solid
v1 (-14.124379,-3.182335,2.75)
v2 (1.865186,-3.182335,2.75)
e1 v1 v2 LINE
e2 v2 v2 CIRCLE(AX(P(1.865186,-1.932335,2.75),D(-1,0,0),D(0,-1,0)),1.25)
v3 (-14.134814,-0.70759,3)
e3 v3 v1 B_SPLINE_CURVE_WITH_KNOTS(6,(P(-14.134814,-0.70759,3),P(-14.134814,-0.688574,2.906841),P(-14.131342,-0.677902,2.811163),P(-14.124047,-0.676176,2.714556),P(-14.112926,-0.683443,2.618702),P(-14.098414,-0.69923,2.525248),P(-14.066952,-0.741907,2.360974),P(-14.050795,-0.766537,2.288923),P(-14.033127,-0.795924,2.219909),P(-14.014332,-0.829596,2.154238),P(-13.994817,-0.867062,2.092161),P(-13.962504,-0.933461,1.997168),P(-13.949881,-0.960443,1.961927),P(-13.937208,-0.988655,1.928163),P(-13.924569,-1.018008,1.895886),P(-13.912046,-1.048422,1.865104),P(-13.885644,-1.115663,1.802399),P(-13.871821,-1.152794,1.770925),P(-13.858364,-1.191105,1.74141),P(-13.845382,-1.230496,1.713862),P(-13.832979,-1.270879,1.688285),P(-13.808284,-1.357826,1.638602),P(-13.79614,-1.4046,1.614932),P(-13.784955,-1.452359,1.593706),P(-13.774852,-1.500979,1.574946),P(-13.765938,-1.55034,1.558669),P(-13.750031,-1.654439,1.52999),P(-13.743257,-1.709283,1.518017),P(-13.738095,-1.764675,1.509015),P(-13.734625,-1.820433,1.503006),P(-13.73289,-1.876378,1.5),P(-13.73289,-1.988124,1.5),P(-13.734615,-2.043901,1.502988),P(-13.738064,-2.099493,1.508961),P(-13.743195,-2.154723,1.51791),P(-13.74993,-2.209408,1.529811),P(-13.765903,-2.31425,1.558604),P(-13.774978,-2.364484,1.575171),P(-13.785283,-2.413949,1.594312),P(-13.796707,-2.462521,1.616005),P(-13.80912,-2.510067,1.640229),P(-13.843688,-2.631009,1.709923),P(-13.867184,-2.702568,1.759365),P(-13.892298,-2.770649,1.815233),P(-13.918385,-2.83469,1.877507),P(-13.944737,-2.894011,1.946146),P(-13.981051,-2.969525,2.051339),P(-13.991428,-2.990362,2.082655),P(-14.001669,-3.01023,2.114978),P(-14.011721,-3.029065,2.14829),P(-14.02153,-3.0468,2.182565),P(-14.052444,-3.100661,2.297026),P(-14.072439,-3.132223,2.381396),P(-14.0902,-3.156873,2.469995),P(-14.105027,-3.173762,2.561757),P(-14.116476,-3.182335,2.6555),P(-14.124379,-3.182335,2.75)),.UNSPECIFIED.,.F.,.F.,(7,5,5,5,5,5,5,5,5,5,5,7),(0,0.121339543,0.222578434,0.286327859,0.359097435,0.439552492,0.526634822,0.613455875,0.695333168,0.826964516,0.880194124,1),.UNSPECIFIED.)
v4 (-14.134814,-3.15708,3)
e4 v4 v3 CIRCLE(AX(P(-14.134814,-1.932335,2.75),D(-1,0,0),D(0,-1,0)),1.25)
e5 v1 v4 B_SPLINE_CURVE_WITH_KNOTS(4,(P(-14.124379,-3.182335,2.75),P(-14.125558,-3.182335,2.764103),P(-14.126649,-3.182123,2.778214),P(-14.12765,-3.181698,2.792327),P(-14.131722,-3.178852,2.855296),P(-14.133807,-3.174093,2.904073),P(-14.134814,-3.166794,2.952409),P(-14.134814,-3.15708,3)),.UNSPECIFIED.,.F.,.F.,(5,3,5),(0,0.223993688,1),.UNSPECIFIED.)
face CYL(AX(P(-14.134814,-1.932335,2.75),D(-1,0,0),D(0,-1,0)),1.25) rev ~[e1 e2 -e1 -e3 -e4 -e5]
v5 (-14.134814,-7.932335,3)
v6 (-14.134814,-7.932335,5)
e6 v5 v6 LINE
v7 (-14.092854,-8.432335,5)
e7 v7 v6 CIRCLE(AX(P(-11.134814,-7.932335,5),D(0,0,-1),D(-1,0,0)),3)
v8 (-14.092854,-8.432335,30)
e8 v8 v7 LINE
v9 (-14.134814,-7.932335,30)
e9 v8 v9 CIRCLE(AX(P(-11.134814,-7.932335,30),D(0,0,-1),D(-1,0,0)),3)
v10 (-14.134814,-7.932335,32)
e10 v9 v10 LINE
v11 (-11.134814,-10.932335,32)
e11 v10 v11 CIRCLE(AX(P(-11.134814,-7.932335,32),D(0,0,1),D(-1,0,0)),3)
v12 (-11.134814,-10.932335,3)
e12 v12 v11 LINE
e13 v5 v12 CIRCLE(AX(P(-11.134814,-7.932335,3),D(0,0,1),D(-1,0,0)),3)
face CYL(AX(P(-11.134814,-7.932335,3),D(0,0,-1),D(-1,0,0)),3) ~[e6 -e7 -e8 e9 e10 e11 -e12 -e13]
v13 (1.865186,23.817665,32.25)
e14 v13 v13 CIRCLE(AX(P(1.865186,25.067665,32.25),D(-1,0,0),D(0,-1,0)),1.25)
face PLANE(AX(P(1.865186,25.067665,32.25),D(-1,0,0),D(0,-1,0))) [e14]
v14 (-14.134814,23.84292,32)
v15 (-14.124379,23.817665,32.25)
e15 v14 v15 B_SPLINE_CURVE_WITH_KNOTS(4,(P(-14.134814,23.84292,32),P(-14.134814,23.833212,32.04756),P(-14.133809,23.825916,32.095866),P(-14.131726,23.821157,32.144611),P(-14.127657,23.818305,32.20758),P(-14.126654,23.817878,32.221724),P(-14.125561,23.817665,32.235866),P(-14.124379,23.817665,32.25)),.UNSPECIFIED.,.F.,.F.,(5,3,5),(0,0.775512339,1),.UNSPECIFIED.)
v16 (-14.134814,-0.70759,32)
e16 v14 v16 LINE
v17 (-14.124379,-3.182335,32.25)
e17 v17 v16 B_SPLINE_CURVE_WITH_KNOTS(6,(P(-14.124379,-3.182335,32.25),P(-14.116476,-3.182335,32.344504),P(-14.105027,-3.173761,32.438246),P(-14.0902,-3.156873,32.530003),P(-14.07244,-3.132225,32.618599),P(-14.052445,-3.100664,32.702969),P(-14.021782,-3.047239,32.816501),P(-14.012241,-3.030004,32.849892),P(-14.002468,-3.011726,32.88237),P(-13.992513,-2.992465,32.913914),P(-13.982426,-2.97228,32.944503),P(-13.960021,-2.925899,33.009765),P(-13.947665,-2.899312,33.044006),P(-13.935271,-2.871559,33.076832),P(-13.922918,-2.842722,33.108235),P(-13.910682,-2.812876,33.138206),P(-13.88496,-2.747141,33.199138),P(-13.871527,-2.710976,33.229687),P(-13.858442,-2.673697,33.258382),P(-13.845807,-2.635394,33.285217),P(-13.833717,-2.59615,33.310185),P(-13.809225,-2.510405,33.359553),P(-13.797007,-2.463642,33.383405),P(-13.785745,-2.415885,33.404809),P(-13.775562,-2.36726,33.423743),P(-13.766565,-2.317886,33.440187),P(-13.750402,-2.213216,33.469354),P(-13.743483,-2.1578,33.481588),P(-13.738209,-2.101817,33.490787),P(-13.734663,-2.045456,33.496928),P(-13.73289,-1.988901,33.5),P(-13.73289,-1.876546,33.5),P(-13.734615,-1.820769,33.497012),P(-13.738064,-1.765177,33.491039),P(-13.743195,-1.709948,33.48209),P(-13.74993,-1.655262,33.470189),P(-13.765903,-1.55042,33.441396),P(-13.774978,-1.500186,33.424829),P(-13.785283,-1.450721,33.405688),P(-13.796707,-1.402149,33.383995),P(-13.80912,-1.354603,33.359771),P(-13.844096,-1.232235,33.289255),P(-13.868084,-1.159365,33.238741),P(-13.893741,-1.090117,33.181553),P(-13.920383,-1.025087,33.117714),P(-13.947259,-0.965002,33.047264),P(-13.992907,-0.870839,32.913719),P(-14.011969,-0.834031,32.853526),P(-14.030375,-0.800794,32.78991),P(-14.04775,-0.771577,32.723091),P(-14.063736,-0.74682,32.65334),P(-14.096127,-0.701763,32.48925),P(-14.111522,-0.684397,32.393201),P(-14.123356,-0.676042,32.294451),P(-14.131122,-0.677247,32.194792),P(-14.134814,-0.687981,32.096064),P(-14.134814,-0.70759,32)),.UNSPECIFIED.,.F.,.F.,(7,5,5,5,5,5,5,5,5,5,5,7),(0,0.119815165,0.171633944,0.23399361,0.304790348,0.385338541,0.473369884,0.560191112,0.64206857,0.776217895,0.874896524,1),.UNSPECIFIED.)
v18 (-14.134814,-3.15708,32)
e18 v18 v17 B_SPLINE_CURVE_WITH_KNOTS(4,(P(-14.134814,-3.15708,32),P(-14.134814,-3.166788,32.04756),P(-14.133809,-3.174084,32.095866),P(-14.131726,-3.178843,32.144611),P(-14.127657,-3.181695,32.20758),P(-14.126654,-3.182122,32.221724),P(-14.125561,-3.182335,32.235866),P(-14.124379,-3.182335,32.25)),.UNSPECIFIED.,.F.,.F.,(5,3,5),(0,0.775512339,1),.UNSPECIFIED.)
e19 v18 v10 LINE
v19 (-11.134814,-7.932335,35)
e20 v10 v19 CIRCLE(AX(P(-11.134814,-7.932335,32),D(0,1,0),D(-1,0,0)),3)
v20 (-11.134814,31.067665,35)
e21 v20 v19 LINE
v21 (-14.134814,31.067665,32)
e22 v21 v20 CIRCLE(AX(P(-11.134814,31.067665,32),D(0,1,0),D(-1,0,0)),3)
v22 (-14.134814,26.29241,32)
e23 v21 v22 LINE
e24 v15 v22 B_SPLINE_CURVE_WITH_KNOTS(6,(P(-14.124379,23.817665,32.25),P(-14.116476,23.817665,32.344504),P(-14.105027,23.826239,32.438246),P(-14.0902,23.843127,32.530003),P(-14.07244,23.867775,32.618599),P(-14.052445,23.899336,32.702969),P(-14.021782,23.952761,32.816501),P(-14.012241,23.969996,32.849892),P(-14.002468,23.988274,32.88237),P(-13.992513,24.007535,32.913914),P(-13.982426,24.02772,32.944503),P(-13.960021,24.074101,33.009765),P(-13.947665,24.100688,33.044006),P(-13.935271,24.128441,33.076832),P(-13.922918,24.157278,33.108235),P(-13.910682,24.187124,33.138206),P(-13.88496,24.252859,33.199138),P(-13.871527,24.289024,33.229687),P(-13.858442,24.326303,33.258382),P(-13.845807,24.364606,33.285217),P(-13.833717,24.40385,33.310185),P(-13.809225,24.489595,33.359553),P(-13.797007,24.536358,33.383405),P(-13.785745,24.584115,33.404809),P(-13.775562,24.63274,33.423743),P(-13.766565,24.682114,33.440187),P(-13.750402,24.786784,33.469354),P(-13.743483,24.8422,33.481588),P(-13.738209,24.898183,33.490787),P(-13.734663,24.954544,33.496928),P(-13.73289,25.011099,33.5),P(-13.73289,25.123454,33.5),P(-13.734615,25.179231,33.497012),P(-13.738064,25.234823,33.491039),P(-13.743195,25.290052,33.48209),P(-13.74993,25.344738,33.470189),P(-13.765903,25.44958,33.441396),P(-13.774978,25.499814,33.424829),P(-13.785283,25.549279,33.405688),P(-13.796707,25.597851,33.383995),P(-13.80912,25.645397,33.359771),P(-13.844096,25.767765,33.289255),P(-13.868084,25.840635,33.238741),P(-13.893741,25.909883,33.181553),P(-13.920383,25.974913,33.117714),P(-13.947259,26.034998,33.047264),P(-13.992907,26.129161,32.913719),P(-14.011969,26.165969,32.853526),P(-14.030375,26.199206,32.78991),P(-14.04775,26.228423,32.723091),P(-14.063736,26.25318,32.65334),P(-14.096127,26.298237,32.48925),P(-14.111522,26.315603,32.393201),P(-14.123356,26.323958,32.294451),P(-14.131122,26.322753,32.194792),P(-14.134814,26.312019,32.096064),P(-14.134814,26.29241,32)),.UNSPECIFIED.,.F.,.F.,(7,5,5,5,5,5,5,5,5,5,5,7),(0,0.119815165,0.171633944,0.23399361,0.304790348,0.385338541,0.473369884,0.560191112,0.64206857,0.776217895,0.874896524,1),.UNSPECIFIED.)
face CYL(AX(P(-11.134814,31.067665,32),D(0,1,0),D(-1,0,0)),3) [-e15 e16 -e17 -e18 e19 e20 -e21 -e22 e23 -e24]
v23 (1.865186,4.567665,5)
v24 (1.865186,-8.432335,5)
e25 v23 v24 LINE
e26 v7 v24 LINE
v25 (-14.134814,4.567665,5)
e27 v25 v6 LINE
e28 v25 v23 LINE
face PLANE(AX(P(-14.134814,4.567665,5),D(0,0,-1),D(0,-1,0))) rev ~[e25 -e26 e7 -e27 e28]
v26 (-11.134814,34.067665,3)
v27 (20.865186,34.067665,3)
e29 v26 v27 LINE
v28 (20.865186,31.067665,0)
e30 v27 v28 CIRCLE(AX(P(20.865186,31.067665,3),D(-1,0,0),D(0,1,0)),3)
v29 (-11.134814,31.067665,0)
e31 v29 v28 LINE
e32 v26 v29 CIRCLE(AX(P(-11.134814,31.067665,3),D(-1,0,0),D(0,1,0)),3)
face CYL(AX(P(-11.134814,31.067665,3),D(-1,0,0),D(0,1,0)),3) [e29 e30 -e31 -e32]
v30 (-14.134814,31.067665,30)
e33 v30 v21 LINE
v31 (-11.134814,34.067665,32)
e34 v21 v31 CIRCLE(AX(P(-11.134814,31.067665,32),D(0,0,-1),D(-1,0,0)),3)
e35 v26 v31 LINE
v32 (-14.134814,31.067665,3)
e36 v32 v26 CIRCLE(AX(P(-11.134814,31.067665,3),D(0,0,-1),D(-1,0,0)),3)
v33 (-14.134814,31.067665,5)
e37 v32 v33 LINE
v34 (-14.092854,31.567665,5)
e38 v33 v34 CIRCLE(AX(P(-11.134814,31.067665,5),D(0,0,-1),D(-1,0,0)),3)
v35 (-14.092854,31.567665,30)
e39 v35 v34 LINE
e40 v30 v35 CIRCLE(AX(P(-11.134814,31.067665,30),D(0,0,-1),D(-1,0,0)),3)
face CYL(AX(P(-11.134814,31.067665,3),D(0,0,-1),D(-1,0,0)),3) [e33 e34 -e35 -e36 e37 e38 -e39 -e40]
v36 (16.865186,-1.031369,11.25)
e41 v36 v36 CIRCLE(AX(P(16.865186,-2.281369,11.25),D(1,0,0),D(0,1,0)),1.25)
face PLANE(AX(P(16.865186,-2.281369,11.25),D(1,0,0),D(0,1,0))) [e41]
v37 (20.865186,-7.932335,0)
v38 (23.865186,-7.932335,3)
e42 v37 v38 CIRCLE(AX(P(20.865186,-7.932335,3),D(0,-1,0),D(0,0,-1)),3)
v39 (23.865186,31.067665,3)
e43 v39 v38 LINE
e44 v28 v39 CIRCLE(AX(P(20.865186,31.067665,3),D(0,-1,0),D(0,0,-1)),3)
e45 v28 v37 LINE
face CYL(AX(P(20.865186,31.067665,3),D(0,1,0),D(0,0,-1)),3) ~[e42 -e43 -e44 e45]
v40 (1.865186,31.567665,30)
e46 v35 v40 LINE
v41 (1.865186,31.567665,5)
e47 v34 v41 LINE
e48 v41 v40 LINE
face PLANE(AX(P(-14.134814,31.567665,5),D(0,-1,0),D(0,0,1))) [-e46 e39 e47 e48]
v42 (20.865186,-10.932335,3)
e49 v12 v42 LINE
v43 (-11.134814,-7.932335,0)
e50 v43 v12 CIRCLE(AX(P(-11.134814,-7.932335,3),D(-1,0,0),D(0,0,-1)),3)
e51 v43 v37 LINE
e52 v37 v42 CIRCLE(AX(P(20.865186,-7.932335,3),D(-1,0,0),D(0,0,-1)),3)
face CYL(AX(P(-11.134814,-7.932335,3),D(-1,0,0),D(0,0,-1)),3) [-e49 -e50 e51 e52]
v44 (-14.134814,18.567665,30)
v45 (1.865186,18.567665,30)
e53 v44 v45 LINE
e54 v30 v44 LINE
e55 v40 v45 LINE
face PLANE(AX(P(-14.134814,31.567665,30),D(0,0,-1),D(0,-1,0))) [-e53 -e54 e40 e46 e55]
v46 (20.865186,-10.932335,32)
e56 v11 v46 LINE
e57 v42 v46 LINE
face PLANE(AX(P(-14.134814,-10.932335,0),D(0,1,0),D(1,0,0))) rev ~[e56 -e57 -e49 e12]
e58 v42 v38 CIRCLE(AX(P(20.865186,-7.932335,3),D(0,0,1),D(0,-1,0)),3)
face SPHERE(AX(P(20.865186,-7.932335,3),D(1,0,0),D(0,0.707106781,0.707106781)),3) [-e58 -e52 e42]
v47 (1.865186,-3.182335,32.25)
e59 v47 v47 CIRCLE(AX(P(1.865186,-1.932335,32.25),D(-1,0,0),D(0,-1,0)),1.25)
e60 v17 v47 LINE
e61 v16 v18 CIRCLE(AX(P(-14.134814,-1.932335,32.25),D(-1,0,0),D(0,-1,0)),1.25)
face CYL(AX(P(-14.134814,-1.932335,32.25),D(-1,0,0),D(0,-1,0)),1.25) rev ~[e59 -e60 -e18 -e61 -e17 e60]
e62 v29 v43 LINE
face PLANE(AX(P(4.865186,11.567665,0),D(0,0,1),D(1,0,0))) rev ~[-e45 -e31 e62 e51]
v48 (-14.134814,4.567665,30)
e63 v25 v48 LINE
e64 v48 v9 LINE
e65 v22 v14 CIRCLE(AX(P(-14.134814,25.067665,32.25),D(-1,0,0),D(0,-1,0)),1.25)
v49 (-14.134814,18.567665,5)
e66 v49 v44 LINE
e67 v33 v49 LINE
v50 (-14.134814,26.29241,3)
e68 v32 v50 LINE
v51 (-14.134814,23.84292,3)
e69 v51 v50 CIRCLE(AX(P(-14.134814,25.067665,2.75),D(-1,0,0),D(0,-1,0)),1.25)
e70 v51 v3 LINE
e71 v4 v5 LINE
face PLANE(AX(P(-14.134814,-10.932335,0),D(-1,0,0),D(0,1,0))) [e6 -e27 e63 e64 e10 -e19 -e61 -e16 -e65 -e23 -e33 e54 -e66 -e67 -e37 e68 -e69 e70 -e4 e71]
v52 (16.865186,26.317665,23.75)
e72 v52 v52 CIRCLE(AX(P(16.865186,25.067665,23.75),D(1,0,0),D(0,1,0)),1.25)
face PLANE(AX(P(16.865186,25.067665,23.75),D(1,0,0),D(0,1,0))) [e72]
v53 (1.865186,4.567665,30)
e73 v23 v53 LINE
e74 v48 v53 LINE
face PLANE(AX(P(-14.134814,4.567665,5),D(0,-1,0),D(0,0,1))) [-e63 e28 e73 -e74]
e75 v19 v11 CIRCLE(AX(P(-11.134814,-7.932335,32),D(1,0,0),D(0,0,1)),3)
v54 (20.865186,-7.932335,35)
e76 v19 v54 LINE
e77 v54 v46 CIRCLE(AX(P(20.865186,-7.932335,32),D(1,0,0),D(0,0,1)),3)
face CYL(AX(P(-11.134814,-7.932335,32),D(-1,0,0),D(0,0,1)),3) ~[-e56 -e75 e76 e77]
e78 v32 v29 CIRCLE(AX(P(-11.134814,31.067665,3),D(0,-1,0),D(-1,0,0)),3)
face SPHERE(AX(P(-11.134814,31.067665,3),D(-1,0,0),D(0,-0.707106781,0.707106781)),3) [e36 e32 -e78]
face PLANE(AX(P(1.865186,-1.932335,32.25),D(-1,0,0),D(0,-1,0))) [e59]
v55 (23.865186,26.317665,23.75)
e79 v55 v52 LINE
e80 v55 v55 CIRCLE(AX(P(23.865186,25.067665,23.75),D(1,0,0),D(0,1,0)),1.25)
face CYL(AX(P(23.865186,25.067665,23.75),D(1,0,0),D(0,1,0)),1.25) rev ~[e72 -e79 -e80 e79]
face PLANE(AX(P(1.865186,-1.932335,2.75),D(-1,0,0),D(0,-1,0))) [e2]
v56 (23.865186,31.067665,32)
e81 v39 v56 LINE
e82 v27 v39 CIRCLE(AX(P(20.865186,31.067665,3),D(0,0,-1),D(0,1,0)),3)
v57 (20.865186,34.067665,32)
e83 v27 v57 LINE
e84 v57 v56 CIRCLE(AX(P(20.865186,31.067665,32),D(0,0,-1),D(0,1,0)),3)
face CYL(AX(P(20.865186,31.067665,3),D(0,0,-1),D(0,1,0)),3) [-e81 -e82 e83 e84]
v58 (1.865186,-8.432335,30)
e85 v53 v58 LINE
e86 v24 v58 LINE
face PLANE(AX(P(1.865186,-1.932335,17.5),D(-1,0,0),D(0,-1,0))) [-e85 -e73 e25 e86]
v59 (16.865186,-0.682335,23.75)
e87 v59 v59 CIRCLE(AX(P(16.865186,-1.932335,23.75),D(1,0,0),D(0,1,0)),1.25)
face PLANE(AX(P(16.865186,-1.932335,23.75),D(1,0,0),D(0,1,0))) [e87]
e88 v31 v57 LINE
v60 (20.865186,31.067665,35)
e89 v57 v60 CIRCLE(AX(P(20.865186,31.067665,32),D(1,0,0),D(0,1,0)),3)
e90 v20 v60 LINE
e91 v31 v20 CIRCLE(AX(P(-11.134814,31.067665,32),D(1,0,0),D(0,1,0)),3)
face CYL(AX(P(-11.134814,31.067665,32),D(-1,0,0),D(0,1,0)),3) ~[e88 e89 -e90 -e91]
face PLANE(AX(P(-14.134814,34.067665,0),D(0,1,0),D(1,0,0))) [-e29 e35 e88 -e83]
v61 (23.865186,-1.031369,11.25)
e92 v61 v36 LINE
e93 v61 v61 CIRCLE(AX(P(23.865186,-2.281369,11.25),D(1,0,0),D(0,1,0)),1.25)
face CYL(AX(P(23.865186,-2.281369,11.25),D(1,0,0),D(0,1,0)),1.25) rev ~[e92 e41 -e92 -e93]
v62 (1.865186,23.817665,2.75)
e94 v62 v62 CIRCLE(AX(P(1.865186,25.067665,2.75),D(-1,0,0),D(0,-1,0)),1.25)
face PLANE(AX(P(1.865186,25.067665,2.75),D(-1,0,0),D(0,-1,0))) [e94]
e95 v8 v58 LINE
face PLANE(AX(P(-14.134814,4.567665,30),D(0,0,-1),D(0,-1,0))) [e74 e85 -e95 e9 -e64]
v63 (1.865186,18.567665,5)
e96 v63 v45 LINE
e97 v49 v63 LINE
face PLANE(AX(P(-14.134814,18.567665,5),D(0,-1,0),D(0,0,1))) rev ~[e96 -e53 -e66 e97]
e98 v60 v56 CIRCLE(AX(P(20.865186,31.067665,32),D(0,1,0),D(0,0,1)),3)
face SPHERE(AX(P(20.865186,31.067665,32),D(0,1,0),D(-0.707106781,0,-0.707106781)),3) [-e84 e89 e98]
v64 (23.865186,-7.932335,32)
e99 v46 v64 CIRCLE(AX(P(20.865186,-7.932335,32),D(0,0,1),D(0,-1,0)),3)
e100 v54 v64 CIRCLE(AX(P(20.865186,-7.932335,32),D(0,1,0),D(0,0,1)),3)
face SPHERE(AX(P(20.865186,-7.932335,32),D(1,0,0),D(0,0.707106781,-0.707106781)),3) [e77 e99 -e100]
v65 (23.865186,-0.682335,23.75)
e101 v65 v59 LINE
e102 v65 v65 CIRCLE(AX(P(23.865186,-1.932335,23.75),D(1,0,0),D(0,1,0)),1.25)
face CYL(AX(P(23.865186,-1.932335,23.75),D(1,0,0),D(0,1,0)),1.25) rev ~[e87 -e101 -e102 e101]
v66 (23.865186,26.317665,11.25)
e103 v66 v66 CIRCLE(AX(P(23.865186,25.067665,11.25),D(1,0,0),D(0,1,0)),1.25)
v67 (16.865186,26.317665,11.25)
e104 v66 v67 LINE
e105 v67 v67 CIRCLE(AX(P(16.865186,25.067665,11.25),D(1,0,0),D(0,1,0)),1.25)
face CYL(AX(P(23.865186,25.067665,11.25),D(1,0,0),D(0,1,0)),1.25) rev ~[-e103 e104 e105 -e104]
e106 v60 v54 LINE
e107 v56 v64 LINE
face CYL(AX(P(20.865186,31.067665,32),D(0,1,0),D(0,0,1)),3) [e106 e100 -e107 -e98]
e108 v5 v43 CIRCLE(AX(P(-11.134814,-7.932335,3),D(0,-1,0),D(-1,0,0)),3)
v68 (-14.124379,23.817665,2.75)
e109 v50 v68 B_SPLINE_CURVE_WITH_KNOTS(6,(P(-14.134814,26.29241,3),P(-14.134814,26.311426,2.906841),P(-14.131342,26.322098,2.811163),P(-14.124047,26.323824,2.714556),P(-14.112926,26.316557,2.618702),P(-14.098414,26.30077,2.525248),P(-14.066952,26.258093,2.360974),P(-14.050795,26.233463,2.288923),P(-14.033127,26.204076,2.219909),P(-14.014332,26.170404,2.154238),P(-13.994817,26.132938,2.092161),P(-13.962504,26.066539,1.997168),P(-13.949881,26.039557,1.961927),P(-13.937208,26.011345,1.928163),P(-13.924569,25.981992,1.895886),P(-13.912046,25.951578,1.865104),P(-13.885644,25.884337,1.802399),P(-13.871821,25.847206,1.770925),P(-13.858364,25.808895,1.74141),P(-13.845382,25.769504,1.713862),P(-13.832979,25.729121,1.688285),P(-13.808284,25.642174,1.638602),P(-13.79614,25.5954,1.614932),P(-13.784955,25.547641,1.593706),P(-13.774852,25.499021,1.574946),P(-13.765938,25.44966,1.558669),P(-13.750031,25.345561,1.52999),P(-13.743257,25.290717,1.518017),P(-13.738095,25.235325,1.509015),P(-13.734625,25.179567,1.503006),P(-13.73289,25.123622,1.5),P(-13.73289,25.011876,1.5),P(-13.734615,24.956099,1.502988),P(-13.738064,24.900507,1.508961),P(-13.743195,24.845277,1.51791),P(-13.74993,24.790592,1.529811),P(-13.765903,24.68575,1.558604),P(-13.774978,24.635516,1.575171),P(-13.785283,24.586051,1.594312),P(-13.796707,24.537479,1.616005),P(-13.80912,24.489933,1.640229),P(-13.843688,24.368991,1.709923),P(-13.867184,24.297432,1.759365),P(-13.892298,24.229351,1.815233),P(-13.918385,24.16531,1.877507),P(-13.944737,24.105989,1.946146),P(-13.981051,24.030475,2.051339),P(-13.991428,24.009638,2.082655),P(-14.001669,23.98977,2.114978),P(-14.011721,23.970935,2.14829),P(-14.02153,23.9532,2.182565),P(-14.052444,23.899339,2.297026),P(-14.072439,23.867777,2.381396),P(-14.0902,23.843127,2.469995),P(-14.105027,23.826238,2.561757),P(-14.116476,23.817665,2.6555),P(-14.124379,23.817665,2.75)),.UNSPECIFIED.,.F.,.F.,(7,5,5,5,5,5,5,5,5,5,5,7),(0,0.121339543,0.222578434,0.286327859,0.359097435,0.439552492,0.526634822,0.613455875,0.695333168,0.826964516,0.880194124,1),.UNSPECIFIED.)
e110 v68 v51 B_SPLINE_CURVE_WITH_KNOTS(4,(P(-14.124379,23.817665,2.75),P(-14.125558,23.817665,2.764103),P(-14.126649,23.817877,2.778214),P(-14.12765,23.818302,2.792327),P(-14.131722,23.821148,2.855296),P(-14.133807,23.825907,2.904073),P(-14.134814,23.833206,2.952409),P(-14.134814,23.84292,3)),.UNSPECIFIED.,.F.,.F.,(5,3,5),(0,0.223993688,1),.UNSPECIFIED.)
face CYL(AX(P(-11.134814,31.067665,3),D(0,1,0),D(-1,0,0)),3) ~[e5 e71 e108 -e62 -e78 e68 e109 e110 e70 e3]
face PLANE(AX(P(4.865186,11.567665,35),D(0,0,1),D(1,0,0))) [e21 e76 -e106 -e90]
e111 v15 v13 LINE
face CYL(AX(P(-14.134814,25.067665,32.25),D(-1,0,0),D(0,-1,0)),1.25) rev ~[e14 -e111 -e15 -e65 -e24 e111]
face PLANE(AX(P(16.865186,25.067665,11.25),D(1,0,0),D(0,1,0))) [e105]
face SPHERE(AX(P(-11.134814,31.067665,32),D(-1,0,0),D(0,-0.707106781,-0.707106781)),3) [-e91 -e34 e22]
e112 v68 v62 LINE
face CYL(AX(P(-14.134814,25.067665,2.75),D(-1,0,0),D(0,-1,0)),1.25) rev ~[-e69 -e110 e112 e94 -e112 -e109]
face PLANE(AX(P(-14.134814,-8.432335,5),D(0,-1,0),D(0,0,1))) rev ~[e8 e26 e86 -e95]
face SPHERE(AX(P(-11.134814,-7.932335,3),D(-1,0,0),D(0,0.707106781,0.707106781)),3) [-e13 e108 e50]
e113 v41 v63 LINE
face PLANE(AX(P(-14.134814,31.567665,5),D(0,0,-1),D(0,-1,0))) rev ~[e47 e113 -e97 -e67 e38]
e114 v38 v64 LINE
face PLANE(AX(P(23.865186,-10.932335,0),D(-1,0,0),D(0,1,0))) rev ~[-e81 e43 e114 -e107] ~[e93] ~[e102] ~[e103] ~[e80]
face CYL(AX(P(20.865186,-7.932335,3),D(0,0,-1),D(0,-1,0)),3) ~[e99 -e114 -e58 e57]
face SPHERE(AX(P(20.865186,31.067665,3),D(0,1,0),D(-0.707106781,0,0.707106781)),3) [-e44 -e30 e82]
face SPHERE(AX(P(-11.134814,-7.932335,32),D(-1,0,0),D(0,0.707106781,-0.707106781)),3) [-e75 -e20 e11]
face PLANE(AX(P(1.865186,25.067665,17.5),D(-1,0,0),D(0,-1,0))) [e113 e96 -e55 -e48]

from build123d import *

# Parameters (mm, degrees)
F0_W         = 38
F0_H         = 45
F1_DEPTH     = 35
F2_W         = 13
F2_H         = 25
F2_R         = 1.25
F3_DEPTH     = 16
F4_T1_DEPTH  = 32
F4_T3_DEPTH  = 39
F4_T5_DEPTH  = 29
F4_S9_W      = 3
F4_S9_H      = 3
F4_T10_DEPTH = 3
F4_S15_W     = 3
F4_S15_H     = 3
F4_T16_DEPTH = 3
F4_S21_W     = 3
F4_S21_H     = 3
F4_T22_DEPTH = 3
F4_S27_W     = 3
F4_S27_H     = 3
F4_T28_DEPTH = 3
F4_S33_W     = 3
F4_S33_H     = 3
F4_T34_DEPTH = 3
F4_S39_W     = 3
F4_S39_H     = 3
F4_T40_DEPTH = 3
F4_S45_W     = 3
F4_S45_H     = 3
F4_T46_DEPTH = 3
F4_S51_W     = 3
F4_S51_H     = 3
F4_T52_DEPTH = 3
F5_R         = 1.25
F6_DEPTH     = 7


# Not quite as in the source:
# - a fillet or chamfer that OpenCascade refuses, or shapes differently, is made with other operations: its cross-section is extruded or revolved along the edge and cut away or added


with BuildPart() as f1:
    # F0 (on Top) → F1 (new body)
    with BuildSketch(Plane.XY):
        with Locations((4.8651863657, 11.567664966)):
            Rectangle(F0_W, F0_H)
    extrude(amount=F1_DEPTH)

    # F2 (on face) → F3 (cut)
    with BuildSketch(Plane(origin=(-14.1348136343, 0, 0), x_dir=(0, -1, 0), z_dir=(-1, 0, 0))):
        with Locations((-25.067664966, 17.5)):
            Rectangle(F2_W, F2_H)
        with Locations((1.932335034, 17.5)):
            Rectangle(F2_W, F2_H)
        with Locations((1.932335034, 32.25)):
            Circle(F2_R)
        with Locations((1.932335034, 2.75)):
            Circle(F2_R)
        with Locations((-25.067664966, 32.25)):
            Circle(F2_R)
        with Locations((-25.067664966, 2.75)):
            Circle(F2_R)
    extrude(amount=-F3_DEPTH, mode=Mode.SUBTRACT)

    # F4: fillet of radius 3 on 12 edges, made by hand

    # F4_s2 → F4_t1 (cut)
    with BuildSketch(Plane.YZ.offset(-11.1348136343)):
        with BuildLine():
            ThreePointArc((34.067664966, 3), (33.1889853095, 0.8786796564), (31.067664966, 0))
            Line((31.067664966, 0), (34.067664966, 0))
            Line((34.067664966, 0), (34.067664966, 3))
        make_face()
        with BuildLine():
            ThreePointArc((34.067664966, 32), (33.1889853095, 34.1213203436), (31.067664966, 35))
            Line((31.067664966, 35), (34.067664966, 35))
            Line((34.067664966, 35), (34.067664966, 32))
        make_face()
        with BuildLine():
            ThreePointArc((-7.932335034, 0), (-10.0536553776, 0.8786796564), (-10.932335034, 3))
            Line((-10.932335034, 3), (-10.932335034, 0))
            Line((-10.932335034, 0), (-7.932335034, 0))
        make_face()
        with BuildLine():
            ThreePointArc((-7.932335034, 35), (-10.0536553776, 34.1213203436), (-10.932335034, 32))
            Line((-10.932335034, 32), (-10.932335034, 35))
            Line((-10.932335034, 35), (-7.932335034, 35))
        make_face()
    extrude(amount=F4_T1_DEPTH, mode=Mode.SUBTRACT)

    # F4_s4 → F4_t3 (cut)
    with BuildSketch(Plane.XZ.offset(-31.067664966)):
        with BuildLine():
            ThreePointArc((20.8651863657, 35), (22.9865067092, 34.1213203436), (23.8651863657, 32))
            Line((23.8651863657, 32), (23.8651863657, 35))
            Line((23.8651863657, 35), (20.8651863657, 35))
        make_face()
        with BuildLine():
            ThreePointArc((20.8651863657, 0), (22.9865067092, 0.8786796564), (23.8651863657, 3))
            Line((23.8651863657, 3), (23.8651863657, 0))
            Line((23.8651863657, 0), (20.8651863657, 0))
        make_face()
        with BuildLine():
            ThreePointArc((-14.1348136343, 32), (-13.2561339779, 34.1213203436), (-11.1348136343, 35))
            Line((-11.1348136343, 35), (-14.1348136343, 35))
            Line((-14.1348136343, 35), (-14.1348136343, 32))
        make_face()
        with BuildLine():
            ThreePointArc((-14.1348136343, 3), (-13.2561339779, 0.8786796564), (-11.1348136343, 0))
            Line((-11.1348136343, 0), (-14.1348136343, 0))
            Line((-14.1348136343, 0), (-14.1348136343, 3))
        make_face()
    extrude(amount=F4_T3_DEPTH, mode=Mode.SUBTRACT)

    # F4_s6 → F4_t5 (cut)
    with BuildSketch(Plane.XY.offset(3)):
        with BuildLine():
            ThreePointArc((20.8651863657, 34.067664966), (22.9865067092, 33.1889853095), (23.8651863657, 31.067664966))
            Line((23.8651863657, 31.067664966), (23.8651863657, 34.067664966))
            Line((23.8651863657, 34.067664966), (20.8651863657, 34.067664966))
        make_face()
        with BuildLine():
            ThreePointArc((20.8651863657, -10.932335034), (22.9865067092, -10.0536553776), (23.8651863657, -7.932335034))
            Line((23.8651863657, -7.932335034), (23.8651863657, -10.932335034))
            Line((23.8651863657, -10.932335034), (20.8651863657, -10.932335034))
        make_face()
        with BuildLine():
            ThreePointArc((-14.1348136343, 31.067664966), (-13.2561339779, 33.1889853095), (-11.1348136343, 34.067664966))
            Line((-11.1348136343, 34.067664966), (-14.1348136343, 34.067664966))
            Line((-14.1348136343, 34.067664966), (-14.1348136343, 31.067664966))
        make_face()
        with BuildLine():
            ThreePointArc((-14.1348136343, -7.932335034), (-13.2561339779, -10.0536553776), (-11.1348136343, -10.932335034))
            Line((-11.1348136343, -10.932335034), (-14.1348136343, -10.932335034))
            Line((-14.1348136343, -10.932335034), (-14.1348136343, -7.932335034))
        make_face()
    extrude(amount=F4_T5_DEPTH, mode=Mode.SUBTRACT)


with BuildPart() as f4_tool8:
    # F4_s9 → F4_t10 (new body)
    with BuildSketch(Plane.XZ.offset(-31.067664966)):
        with Locations((22.3651863657, 1.5)):
            Rectangle(F4_S9_W, F4_S9_H)
    extrude(amount=-F4_T10_DEPTH)

    # F4_s11 → F4_t12 (revolve, cut)
    with BuildSketch(Plane(origin=(20.8651863657, 31.067664966, 3), x_dir=(-0.7071067812, 0, 0.7071067812), z_dir=(-0.7071067812, 0, -0.7071067812))):
        with BuildLine():
            ThreePointArc((0, -3), (3, 0), (0, 3))
            Line((0, 3), (0, -3))
        make_face()
    revolve(axis=Axis((20.8651863657, 31.067664966, 3), (0, 1, 0)), mode=Mode.SUBTRACT)


with BuildPart() as f1_1:
    add(f1.part)

    # F4_t7: cut F4_tool8
    add(f4_tool8.part, mode=Mode.SUBTRACT)


with BuildPart() as f4_tool14:
    # F4_s15 → F4_t16 (new body)
    with BuildSketch(Plane.YZ.offset(-11.1348136343)):
        with Locations((32.567664966, 1.5)):
            Rectangle(F4_S15_W, F4_S15_H)
    extrude(amount=-F4_T16_DEPTH)

    # F4_s17 → F4_t18 (revolve, cut)
    with BuildSketch(Plane(origin=(-11.1348136343, 31.067664966, 3), x_dir=(0, -0.7071067812, 0.7071067812), z_dir=(0, -0.7071067812, -0.7071067812))):
        with BuildLine():
            ThreePointArc((0, -3), (3, 0), (0, 3))
            Line((0, 3), (0, -3))
        make_face()
    revolve(axis=Axis((-11.1348136343, 31.067664966, 3), (-1, 0, 0)), mode=Mode.SUBTRACT)


with BuildPart() as f1_2:
    add(f1_1.part)

    # F4_t13: cut F4_tool14
    add(f4_tool14.part, mode=Mode.SUBTRACT)


with BuildPart() as f4_tool20:
    # F4_s21 → F4_t22 (new body)
    with BuildSketch(Plane.XZ.offset(-31.067664966)):
        with Locations((22.3651863657, 33.5)):
            Rectangle(F4_S21_W, F4_S21_H)
    extrude(amount=-F4_T22_DEPTH)

    # F4_s23 → F4_t24 (revolve, cut)
    with BuildSketch(Plane(origin=(20.8651863657, 31.067664966, 32), x_dir=(-0.7071067812, 0, -0.7071067812), z_dir=(0.7071067812, 0, -0.7071067812))):
        with BuildLine():
            ThreePointArc((0, -3), (3, 0), (0, 3))
            Line((0, 3), (0, -3))
        make_face()
    revolve(axis=Axis((20.8651863657, 31.067664966, 32), (0, 1, 0)), mode=Mode.SUBTRACT)


with BuildPart() as f1_3:
    add(f1_2.part)

    # F4_t19: cut F4_tool20
    add(f4_tool20.part, mode=Mode.SUBTRACT)


with BuildPart() as f4_tool26:
    # F4_s27 → F4_t28 (new body)
    with BuildSketch(Plane.YZ.offset(-11.1348136343)):
        with Locations((32.567664966, 33.5)):
            Rectangle(F4_S27_W, F4_S27_H)
    extrude(amount=-F4_T28_DEPTH)

    # F4_s29 → F4_t30 (revolve, cut)
    with BuildSketch(Plane(origin=(-11.1348136343, 31.067664966, 32), x_dir=(0, -0.7071067812, -0.7071067812), z_dir=(0, 0.7071067812, -0.7071067812))):
        with BuildLine():
            ThreePointArc((0, -3), (3, 0), (0, 3))
            Line((0, 3), (0, -3))
        make_face()
    revolve(axis=Axis((-11.1348136343, 31.067664966, 32), (-1, 0, 0)), mode=Mode.SUBTRACT)


with BuildPart() as f1_4:
    add(f1_3.part)

    # F4_t25: cut F4_tool26
    add(f4_tool26.part, mode=Mode.SUBTRACT)


with BuildPart() as f4_tool32:
    # F4_s33 → F4_t34 (new body)
    with BuildSketch(Plane.YZ.offset(-11.1348136343)):
        with Locations((-9.432335034, 1.5)):
            Rectangle(F4_S33_W, F4_S33_H)
    extrude(amount=-F4_T34_DEPTH)

    # F4_s35 → F4_t36 (revolve, cut)
    with BuildSketch(Plane(origin=(-11.1348136343, -7.932335034, 3), x_dir=(0, 0.7071067812, 0.7071067812), z_dir=(0, -0.7071067812, 0.7071067812))):
        with BuildLine():
            ThreePointArc((0, -3), (3, 0), (0, 3))
            Line((0, 3), (0, -3))
        make_face()
    revolve(axis=Axis((-11.1348136343, -7.932335034, 3), (-1, 0, 0)), mode=Mode.SUBTRACT)


with BuildPart() as f1_5:
    add(f1_4.part)

    # F4_t31: cut F4_tool32
    add(f4_tool32.part, mode=Mode.SUBTRACT)


with BuildPart() as f4_tool38:
    # F4_s39 → F4_t40 (new body)
    with BuildSketch(Plane.YZ.offset(20.8651863657)):
        with Locations((-9.432335034, 1.5)):
            Rectangle(F4_S39_W, F4_S39_H)
    extrude(amount=F4_T40_DEPTH)

    # F4_s41 → F4_t42 (revolve, cut)
    with BuildSketch(Plane(origin=(20.8651863657, -7.932335034, 3), x_dir=(0, 0.7071067812, 0.7071067812), z_dir=(0, 0.7071067812, -0.7071067812))):
        with BuildLine():
            ThreePointArc((0, -3), (3, 0), (0, 3))
            Line((0, 3), (0, -3))
        make_face()
    revolve(axis=Axis((20.8651863657, -7.932335034, 3), (1, 0, 0)), mode=Mode.SUBTRACT)


with BuildPart() as f1_6:
    add(f1_5.part)

    # F4_t37: cut F4_tool38
    add(f4_tool38.part, mode=Mode.SUBTRACT)


with BuildPart() as f4_tool44:
    # F4_s45 → F4_t46 (new body)
    with BuildSketch(Plane.YZ.offset(-11.1348136343)):
        with Locations((-9.432335034, 33.5)):
            Rectangle(F4_S45_W, F4_S45_H)
    extrude(amount=-F4_T46_DEPTH)

    # F4_s47 → F4_t48 (revolve, cut)
    with BuildSketch(Plane(origin=(-11.1348136343, -7.932335034, 32), x_dir=(0, 0.7071067812, -0.7071067812), z_dir=(0, 0.7071067812, 0.7071067812))):
        with BuildLine():
            ThreePointArc((0, -3), (3, 0), (0, 3))
            Line((0, 3), (0, -3))
        make_face()
    revolve(axis=Axis((-11.1348136343, -7.932335034, 32), (-1, 0, 0)), mode=Mode.SUBTRACT)


with BuildPart() as f1_7:
    add(f1_6.part)

    # F4_t43: cut F4_tool44
    add(f4_tool44.part, mode=Mode.SUBTRACT)


with BuildPart() as f4_tool50:
    # F4_s51 → F4_t52 (new body)
    with BuildSketch(Plane.YZ.offset(20.8651863657)):
        with Locations((-9.432335034, 33.5)):
            Rectangle(F4_S51_W, F4_S51_H)
    extrude(amount=F4_T52_DEPTH)

    # F4_s53 → F4_t54 (revolve, cut)
    with BuildSketch(Plane(origin=(20.8651863657, -7.932335034, 32), x_dir=(0, 0.7071067812, -0.7071067812), z_dir=(0, -0.7071067812, -0.7071067812))):
        with BuildLine():
            ThreePointArc((0, -3), (3, 0), (0, 3))
            Line((0, 3), (0, -3))
        make_face()
    revolve(axis=Axis((20.8651863657, -7.932335034, 32), (1, 0, 0)), mode=Mode.SUBTRACT)


with BuildPart() as f1_8:
    add(f1_7.part)

    # F4_t49: cut F4_tool50
    add(f4_tool50.part, mode=Mode.SUBTRACT)

    # F5 (on face) → F6 (cut)
    with BuildSketch(Plane.YZ.offset(23.8651863657)):
        with Locations((-1.932335034, 23.75)):
            Circle(F5_R)
        with Locations((-2.2813694086, 11.25)):
            Circle(F5_R)
        with Locations((25.067664966, 23.75)):
            Circle(F5_R)
        with Locations((25.067664966, 11.25)):
            Circle(F5_R)
    extrude(amount=-F6_DEPTH, mode=Mode.SUBTRACT)


solid = f1_8.part
